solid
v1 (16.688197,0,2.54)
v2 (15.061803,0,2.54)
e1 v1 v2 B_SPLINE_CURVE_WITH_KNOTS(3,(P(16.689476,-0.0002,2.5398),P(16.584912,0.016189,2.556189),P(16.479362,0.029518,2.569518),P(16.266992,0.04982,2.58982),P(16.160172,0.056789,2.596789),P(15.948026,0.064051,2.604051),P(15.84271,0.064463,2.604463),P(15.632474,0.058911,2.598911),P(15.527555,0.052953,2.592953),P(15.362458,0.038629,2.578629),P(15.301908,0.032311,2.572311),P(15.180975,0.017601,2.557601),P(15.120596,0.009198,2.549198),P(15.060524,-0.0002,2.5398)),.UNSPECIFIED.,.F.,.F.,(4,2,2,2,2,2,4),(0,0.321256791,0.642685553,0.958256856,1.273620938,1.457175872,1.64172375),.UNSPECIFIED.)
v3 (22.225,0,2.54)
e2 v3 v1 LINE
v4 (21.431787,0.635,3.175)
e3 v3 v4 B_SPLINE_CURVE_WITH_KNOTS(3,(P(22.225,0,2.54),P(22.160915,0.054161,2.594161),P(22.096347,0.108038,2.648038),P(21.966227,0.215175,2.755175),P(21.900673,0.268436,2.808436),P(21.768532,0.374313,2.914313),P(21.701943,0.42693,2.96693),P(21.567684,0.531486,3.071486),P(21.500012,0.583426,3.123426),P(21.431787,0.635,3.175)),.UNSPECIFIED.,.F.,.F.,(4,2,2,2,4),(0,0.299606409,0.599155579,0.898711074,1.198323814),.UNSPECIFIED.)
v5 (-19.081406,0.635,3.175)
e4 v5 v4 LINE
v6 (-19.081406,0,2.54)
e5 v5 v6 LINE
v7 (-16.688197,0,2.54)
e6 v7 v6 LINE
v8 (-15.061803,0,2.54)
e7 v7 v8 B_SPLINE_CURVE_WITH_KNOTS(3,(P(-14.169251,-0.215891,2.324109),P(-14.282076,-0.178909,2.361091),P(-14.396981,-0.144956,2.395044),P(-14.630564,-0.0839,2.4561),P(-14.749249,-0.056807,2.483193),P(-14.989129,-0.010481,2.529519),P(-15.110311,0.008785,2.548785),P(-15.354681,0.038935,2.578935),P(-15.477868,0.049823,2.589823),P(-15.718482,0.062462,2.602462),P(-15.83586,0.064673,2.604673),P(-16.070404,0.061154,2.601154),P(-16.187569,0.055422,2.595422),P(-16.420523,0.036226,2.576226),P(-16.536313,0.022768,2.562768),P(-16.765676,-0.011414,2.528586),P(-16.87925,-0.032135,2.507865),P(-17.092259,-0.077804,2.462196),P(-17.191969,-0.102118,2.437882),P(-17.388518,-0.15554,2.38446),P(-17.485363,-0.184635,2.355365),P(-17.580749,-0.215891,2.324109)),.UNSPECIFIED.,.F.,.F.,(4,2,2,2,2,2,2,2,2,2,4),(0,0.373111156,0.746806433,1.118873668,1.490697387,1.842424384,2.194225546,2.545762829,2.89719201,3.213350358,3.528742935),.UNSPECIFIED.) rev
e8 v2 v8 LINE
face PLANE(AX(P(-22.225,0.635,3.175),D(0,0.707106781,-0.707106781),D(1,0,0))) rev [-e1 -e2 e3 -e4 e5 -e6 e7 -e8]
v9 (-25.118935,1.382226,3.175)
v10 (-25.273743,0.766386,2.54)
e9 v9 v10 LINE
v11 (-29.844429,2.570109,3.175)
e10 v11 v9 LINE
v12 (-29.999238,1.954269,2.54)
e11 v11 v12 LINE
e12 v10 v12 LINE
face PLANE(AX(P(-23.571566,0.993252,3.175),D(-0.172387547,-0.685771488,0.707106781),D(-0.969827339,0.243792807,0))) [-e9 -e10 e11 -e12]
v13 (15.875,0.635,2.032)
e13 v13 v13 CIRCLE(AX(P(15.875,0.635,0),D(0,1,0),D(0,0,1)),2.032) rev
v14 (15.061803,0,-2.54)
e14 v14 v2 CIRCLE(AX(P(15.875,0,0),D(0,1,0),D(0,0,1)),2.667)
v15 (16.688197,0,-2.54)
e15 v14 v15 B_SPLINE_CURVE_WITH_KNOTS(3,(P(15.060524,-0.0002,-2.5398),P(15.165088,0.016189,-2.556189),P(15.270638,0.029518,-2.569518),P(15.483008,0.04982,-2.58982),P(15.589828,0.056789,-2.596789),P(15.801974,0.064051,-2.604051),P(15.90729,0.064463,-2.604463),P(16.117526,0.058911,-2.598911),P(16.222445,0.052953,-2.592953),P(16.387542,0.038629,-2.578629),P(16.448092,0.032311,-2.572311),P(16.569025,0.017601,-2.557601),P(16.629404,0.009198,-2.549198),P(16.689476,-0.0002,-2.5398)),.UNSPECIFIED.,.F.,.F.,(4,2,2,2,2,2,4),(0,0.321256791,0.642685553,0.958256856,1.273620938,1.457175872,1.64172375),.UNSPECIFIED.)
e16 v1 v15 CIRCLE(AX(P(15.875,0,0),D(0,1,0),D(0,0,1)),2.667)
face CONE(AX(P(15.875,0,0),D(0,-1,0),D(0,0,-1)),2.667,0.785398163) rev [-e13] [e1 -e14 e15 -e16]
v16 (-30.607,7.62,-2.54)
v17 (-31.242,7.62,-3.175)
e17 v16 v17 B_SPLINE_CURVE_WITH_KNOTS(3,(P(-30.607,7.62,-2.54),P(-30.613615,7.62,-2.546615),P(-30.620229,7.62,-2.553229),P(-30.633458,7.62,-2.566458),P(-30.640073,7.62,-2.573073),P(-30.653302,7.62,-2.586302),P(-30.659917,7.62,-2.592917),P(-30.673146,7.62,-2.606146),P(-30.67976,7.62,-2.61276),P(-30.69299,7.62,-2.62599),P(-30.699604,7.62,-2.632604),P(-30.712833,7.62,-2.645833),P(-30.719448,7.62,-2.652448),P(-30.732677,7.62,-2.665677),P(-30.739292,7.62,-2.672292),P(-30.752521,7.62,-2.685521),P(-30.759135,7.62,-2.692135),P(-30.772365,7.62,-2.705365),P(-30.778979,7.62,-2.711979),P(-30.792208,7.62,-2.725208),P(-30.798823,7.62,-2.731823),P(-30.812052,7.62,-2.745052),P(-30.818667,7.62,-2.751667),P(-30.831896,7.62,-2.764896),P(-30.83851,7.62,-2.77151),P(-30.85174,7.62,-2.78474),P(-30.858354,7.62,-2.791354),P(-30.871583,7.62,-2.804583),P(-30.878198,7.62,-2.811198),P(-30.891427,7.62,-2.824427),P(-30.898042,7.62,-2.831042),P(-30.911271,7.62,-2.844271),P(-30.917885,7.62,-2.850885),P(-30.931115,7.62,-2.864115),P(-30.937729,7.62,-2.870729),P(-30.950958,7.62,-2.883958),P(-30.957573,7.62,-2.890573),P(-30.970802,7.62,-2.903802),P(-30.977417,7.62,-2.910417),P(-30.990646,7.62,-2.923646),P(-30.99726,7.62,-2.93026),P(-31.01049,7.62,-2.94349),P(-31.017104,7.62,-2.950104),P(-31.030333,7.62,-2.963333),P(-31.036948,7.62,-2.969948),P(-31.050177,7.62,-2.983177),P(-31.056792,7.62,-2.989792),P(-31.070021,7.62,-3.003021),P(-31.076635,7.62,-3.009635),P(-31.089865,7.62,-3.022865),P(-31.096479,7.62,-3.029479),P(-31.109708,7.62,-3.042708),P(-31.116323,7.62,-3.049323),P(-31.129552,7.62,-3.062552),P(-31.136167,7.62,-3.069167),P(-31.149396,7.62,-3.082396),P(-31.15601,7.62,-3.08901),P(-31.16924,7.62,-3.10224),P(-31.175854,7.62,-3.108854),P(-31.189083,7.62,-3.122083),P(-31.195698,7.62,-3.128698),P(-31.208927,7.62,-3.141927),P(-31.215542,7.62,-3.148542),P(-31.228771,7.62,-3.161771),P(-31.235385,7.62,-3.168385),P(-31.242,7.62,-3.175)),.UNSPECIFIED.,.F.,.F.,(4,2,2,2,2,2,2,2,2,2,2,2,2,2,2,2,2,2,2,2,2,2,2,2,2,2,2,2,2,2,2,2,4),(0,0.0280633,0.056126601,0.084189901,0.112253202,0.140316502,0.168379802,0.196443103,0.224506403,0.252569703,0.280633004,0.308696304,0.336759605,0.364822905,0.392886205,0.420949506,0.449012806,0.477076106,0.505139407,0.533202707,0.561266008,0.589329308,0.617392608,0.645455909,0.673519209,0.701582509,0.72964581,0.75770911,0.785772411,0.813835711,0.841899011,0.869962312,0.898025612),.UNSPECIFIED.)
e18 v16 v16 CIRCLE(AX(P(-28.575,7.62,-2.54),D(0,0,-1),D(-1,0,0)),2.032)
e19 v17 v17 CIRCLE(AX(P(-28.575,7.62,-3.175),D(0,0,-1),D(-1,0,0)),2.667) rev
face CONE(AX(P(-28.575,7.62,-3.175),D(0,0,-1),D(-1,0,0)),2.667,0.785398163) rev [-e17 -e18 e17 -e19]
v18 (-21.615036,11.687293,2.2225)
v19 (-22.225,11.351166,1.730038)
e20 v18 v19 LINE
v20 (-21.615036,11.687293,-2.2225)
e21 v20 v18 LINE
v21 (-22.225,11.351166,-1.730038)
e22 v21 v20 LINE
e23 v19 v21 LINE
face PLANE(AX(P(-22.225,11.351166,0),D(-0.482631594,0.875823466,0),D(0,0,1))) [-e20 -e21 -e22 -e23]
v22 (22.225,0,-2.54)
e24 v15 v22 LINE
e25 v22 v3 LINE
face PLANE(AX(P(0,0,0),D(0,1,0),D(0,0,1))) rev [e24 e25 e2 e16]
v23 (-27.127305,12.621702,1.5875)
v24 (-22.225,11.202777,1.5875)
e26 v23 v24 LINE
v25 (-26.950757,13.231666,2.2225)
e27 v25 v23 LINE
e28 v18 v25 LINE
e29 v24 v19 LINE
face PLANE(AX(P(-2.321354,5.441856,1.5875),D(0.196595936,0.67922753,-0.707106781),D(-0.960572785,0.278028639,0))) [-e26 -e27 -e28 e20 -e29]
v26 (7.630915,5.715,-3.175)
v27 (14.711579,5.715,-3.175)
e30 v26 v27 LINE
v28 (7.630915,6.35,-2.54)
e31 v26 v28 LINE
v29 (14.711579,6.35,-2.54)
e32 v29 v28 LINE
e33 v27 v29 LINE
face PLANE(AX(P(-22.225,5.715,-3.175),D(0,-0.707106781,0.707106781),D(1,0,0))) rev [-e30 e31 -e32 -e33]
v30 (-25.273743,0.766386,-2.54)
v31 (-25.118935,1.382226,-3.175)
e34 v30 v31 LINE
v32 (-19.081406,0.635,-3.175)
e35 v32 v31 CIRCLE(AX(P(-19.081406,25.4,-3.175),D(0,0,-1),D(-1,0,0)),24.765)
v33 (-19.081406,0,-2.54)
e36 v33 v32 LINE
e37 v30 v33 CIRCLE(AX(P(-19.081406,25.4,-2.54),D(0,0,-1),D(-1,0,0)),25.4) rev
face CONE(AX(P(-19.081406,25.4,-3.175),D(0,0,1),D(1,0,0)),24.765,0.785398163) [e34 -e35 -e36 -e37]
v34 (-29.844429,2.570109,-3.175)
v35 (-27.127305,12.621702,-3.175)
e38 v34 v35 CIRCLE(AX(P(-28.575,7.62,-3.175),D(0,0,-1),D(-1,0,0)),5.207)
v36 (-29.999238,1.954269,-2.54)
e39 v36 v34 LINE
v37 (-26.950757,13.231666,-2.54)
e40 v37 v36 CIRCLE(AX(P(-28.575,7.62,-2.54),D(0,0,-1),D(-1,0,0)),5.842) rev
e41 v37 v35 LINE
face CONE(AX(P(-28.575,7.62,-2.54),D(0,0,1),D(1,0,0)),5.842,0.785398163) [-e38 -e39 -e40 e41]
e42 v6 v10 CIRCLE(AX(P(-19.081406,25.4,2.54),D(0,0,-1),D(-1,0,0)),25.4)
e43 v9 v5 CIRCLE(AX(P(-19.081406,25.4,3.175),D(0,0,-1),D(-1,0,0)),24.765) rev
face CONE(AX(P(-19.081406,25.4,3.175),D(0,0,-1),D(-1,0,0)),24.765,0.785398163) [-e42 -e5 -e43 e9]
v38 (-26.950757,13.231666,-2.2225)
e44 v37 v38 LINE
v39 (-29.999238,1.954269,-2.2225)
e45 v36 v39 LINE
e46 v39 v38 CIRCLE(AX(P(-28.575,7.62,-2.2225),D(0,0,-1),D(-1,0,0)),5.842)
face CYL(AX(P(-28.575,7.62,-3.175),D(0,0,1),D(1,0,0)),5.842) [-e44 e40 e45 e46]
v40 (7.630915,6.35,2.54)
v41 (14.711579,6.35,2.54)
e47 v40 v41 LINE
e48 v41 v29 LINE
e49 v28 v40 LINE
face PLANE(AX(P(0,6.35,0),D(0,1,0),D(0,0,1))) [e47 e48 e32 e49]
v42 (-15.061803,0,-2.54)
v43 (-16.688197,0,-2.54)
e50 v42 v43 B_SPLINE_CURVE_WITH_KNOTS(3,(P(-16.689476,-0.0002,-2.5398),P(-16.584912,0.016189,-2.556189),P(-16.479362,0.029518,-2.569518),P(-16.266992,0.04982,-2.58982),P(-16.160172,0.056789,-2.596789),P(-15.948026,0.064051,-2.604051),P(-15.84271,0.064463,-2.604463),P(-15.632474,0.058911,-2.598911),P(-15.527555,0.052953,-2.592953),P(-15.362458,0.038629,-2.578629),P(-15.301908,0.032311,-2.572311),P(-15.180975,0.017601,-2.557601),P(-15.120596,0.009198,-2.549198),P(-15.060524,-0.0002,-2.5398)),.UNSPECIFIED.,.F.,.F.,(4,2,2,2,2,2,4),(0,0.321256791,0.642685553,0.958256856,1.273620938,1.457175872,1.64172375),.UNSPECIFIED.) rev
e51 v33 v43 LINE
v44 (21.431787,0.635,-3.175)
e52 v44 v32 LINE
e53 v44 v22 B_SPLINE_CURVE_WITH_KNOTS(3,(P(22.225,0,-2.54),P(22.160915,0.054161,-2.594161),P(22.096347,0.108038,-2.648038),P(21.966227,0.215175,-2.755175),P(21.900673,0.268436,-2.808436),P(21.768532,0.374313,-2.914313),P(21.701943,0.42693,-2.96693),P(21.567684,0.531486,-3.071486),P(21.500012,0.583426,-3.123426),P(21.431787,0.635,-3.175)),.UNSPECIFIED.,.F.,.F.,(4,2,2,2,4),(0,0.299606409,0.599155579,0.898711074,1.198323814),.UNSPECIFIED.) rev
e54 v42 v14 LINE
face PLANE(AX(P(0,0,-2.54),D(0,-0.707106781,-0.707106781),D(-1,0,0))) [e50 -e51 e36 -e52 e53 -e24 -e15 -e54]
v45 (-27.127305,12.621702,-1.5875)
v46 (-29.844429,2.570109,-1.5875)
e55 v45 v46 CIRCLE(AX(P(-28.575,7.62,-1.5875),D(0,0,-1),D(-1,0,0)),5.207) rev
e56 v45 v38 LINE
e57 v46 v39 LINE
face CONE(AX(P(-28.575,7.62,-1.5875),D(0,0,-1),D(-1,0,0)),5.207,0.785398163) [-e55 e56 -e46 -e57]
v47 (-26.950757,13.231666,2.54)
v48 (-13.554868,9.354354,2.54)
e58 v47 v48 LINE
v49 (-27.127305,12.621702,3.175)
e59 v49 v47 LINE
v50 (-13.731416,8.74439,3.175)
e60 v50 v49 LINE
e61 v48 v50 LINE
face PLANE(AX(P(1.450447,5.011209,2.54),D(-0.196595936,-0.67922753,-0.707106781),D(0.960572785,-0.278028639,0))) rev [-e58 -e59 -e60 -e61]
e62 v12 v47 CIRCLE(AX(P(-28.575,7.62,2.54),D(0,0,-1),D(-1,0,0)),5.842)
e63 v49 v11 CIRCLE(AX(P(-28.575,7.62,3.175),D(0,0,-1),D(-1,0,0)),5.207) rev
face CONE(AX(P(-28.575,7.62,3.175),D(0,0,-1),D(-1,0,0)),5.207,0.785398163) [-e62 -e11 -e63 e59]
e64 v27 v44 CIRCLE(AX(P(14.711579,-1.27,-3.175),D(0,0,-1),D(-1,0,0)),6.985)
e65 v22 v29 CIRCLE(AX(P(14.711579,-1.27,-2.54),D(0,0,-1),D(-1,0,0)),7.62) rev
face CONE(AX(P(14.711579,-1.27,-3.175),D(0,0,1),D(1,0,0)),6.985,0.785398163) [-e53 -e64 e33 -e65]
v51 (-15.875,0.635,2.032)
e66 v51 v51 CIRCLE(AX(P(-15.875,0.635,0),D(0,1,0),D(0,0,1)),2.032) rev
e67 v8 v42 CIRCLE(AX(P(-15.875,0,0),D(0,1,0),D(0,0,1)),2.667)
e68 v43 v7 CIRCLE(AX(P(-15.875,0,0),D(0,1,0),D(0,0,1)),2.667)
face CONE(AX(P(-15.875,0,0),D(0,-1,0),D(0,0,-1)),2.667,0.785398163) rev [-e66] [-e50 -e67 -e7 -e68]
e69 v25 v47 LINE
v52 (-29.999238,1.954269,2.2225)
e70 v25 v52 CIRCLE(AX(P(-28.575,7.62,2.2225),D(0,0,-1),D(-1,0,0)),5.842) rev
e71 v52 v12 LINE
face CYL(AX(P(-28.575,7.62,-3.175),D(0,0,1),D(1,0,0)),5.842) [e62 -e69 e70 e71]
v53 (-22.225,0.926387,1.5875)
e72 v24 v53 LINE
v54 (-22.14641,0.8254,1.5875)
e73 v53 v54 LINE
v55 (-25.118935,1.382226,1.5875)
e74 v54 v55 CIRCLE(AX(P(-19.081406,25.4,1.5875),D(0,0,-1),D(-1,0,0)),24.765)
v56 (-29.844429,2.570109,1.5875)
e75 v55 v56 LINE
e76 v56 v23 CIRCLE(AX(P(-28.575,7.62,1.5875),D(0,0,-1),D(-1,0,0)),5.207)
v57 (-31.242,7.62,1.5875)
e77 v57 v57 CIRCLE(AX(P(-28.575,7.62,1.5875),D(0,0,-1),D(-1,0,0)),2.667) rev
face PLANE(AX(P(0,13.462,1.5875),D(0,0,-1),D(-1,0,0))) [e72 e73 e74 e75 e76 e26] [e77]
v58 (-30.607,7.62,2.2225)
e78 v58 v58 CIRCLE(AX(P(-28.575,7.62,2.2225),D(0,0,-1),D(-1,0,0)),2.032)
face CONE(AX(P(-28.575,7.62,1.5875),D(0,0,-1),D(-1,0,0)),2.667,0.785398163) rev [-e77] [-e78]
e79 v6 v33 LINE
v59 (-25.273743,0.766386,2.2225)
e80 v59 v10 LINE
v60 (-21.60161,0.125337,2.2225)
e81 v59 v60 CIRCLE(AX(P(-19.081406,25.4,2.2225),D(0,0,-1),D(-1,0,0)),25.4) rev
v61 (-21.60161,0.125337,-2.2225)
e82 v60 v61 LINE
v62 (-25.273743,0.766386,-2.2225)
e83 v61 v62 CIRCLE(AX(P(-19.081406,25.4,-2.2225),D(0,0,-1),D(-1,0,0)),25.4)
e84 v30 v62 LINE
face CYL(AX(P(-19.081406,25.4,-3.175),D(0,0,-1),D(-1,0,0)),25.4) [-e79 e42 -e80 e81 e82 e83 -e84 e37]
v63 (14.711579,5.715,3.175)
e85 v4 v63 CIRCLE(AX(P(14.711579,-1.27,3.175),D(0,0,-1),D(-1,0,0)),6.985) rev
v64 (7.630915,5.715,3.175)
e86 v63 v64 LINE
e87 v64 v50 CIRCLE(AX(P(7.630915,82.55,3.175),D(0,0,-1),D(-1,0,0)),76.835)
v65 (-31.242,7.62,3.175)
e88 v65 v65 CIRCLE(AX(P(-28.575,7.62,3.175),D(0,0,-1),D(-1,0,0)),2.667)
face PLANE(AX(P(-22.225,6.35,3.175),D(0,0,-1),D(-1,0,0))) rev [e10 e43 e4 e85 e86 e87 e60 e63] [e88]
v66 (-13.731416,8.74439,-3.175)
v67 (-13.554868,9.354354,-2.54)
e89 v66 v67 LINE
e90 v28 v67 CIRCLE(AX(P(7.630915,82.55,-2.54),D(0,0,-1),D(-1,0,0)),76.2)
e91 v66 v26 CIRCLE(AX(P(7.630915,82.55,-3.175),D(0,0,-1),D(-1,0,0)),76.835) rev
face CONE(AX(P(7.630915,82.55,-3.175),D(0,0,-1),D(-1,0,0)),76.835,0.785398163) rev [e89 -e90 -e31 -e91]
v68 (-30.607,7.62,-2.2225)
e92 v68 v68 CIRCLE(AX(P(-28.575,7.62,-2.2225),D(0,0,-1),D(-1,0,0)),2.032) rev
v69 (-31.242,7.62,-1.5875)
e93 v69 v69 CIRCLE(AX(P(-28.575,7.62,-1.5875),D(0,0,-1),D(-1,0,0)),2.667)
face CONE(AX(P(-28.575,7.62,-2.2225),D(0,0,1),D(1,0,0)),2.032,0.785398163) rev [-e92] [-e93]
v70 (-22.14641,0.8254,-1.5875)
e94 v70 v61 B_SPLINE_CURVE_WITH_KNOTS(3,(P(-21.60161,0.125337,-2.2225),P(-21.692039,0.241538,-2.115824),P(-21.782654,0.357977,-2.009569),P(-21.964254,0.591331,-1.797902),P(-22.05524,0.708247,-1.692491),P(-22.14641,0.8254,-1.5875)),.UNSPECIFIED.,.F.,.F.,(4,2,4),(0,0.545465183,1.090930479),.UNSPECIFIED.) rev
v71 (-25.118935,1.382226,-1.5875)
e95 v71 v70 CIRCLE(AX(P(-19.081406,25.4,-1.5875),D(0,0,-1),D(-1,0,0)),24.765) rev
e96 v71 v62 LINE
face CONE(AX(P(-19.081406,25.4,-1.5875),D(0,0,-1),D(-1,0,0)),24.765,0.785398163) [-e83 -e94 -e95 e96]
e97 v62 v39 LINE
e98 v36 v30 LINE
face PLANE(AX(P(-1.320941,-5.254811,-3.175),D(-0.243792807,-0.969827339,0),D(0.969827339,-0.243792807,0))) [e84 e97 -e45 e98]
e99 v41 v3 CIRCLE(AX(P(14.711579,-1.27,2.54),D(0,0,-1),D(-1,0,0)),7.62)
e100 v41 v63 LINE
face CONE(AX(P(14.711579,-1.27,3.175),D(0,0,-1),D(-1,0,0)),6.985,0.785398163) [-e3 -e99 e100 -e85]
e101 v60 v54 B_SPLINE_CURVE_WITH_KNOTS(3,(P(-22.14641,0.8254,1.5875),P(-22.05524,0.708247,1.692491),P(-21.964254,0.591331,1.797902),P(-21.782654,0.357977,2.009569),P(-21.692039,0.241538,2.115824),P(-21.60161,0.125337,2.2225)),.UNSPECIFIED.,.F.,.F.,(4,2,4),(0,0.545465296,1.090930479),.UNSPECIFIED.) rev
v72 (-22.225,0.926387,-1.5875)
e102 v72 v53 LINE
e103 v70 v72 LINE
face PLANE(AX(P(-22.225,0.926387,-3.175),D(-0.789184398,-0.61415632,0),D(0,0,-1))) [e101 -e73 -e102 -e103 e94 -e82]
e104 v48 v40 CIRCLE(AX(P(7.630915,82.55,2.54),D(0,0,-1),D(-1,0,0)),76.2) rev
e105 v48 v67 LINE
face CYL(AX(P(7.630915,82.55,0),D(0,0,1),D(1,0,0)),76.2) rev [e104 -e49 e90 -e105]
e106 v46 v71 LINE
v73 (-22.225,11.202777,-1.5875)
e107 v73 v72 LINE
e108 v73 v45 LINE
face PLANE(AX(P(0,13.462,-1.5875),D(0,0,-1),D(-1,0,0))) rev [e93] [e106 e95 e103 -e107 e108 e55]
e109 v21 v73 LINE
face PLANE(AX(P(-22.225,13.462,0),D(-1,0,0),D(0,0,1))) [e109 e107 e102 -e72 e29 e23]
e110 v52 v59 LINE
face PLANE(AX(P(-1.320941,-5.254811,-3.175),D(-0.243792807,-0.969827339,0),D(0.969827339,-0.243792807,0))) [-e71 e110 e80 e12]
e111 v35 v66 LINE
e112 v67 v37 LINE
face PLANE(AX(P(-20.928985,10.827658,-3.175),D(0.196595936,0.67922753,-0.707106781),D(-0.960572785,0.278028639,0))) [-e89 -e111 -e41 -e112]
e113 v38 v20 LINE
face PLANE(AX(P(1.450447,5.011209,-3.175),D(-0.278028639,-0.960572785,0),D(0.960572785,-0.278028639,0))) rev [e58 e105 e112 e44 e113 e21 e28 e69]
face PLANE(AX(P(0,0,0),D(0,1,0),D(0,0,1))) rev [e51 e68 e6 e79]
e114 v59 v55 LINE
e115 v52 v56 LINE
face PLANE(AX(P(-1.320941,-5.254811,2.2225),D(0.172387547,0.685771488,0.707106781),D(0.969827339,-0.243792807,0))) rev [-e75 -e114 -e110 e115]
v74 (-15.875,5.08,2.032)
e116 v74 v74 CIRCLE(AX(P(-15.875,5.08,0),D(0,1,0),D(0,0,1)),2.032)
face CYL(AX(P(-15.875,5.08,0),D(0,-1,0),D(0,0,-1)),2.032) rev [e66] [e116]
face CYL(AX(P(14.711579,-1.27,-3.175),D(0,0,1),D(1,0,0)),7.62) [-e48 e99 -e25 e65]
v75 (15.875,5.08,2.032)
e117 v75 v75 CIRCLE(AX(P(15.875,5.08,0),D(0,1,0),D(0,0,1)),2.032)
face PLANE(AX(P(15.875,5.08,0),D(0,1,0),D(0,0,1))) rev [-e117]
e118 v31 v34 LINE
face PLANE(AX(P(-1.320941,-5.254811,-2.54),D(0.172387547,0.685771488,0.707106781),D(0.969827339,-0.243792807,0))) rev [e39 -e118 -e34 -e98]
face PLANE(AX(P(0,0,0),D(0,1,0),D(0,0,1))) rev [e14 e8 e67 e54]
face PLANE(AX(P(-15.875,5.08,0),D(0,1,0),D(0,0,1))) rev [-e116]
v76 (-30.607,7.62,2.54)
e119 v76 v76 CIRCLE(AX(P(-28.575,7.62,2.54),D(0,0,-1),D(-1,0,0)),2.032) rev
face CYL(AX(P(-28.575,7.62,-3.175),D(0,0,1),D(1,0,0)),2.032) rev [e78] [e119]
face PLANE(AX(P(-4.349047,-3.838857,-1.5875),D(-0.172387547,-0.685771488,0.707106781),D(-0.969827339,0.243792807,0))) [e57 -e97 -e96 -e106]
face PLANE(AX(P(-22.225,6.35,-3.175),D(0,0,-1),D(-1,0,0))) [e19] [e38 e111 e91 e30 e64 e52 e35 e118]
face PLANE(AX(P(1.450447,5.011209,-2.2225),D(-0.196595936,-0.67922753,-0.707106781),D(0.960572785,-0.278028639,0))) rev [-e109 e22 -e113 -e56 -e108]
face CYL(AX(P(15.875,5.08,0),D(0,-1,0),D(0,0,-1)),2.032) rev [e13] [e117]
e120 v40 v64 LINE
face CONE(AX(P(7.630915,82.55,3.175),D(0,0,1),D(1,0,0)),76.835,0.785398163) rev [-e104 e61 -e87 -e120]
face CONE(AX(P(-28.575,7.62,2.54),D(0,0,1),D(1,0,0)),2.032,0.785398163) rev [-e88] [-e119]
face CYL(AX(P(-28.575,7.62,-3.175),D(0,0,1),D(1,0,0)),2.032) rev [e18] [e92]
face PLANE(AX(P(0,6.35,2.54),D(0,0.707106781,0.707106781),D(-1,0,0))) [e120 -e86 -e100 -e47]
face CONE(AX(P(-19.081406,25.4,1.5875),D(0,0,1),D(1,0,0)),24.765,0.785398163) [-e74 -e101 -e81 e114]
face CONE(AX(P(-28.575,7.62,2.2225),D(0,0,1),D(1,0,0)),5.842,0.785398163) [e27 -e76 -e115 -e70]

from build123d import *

# Parameters (mm, degrees)
SKETCH1_W           = 44.45
SKETCH1_H           = 6.35
BOSS_EXTRUDE1_DEPTH = 6.35
SKETCH2_R           = 5.842
SKETCH2_R_2         = 2.032
BOSS_EXTRUDE2_DEPTH = 6.35
SKETCH4_W           = 12.192
SKETCH4_H           = 3.175
CUT_EXTRUDE2_DEPTH  = 38.092262778
FILLET1_R           = 76.2
FILLET2_R           = 25.4
FILLET3_R           = 7.62
SKETCH1_3_R         = 2.032
CUT_EXTRUDE1_DEPTH  = 5.08
CHAMFER2_SIZE       = 0.635
CHAMFER2_SIZE_2     = 0.512675012
CHAMFER2_SIZE_3     = 0.731105081


with BuildPart() as part:
    # Sketch1 → Boss-Extrude1 (new body)
    with BuildSketch(Plane(origin=(0, 0, 0), x_dir=(1, 0, 0), z_dir=(0, 1, 0))):
        Rectangle(SKETCH1_W, SKETCH1_H)
    extrude(amount=BOSS_EXTRUDE1_DEPTH)

    # Sketch2 → Boss-Extrude2 (add, through all)
    # profile 1 of 2: a face of its own
    with BuildSketch(Plane.XY.offset(3.175)):
        with BuildLine():
            Line((-3.175, 6.35), (-26.950756689, 13.231666211))
            ThreePointArc((-26.950756689, 13.231666211), (-23.905000352, 11.12999534), (-22.733, 7.62))
            ThreePointArc((-22.733, 7.62), (-24.982746663, 3.012974934), (-29.999237577, 1.954268686))
            Line((-29.999237577, 1.954268686), (-22.225, 0))
            Line((-22.225, 0), (-22.225, 6.35))
            Line((-22.225, 6.35), (-3.175, 6.35))
        make_face()
    # profile 2 of 2: a face of its own
    with BuildSketch(Plane.XY.offset(3.175)):
        with Locations((-28.575, 7.62)):
            Circle(SKETCH2_R)
        with Locations((-28.575, 7.62)):
            Circle(SKETCH2_R_2, mode=Mode.SUBTRACT)
    extrude(amount=-BOSS_EXTRUDE2_DEPTH)

    # Sketch4 → Cut-Extrude2 (cut, through all)
    with BuildSketch(Plane.XZ):
        with Locations((-28.321, 0)):
            Rectangle(SKETCH4_W, SKETCH4_H)
    extrude(amount=-CUT_EXTRUDE2_DEPTH, mode=Mode.SUBTRACT)

    # Fillet1
    fillet1_edges = [part.edges().sort_by_distance(p)[0] for p in [
        (-3.175, 6.35, 0),
    ]]
    fillet(fillet1_edges, radius=FILLET1_R)

    # Fillet2
    # the kernel refuses this fillet: 25.4 mm, written as the material it takes off along each edge
    with BuildSketch(Plane(origin=(-22.225, 0, 6.271484857), x_dir=(-0.9698273389527705, 0.2437928067433249, 0), z_dir=(0, 0, -1))) as fillet2_piece_1:
        with BuildLine():
            CenterArc((FILLET2_R * 0.123763541059, FILLET2_R), FILLET2_R, 255.889496413, 14.110503587)
            Line((-FILLET2_R * 0.120029265684, FILLET2_R * 0.0301726610472), (0, 0))
            Line((0, 0), (FILLET2_R * 0.123763541059, 0))
        make_face()
    extrude(amount=17.305469714, mode=Mode.SUBTRACT)
    with BuildSketch(Plane(origin=(-22.225, 0, 11.033984857), x_dir=(1, 0, 0), z_dir=(0, 0, -1))) as fillet2_piece_2:
        with BuildLine():
            CenterArc((FILLET2_R * 0.123763541059, -FILLET2_R), FILLET2_R, 90, 14.110503587)
            Line((-FILLET2_R * 0.120029265684, -FILLET2_R * 0.0301726610472), (0, 0))
            Line((0, 0), (FILLET2_R * 0.123763541059, 0))
        make_face()
    extrude(amount=17.305469714, mode=Mode.SUBTRACT)

    # Fillet3
    # the kernel refuses this fillet: 7.62 mm, written as the material it takes off along each edge
    with BuildSketch(Plane(origin=(22.225, 6.35, -21.958553311), x_dir=(0, -1, 0), z_dir=(0, 0, 1))) as fillet3_piece_1:
        with BuildLine():
            CenterArc((7.62, -7.513421325), FILLET3_R, 99.594068227, 80.405931773)
            Line((0, -7.513421325), (-0.1524, -7.513421325))
            Line((-0.1524, -7.513421325), (-0.1524, 0))
            Line((-0.1524, 0), (0, 0.1524))
            ThreePointArc((0, 0.1524), (3.175, 0.1524), (6.3246, 0.150268426))
            Line((6.3246, 0.150268426), (6.35, 0))
        make_face()
    extrude(amount=43.917106623, mode=Mode.SUBTRACT)

    # Sketch1<3> → Cut-Extrude1 (cut)
    with BuildSketch(Plane(origin=(0, 0, 0), x_dir=(1, 0, 0), z_dir=(0, 1, 0))):
        with Locations(Location((-15.875, 0, 0), (0, 0, 270))):
            Circle(SKETCH1_3_R)
        with Locations(Location((15.875, 0, 0), (0, 0, 270))):
            Circle(SKETCH1_3_R)
    extrude(amount=CUT_EXTRUDE1_DEPTH, mode=Mode.SUBTRACT)

    # Chamfer2
    # the kernel refuses this chamfer: 0.731105081, 0.635, 0.512675012 mm, written as the material it takes off along each edge
    with BuildSketch(Plane(origin=(-13.554867596, 9.354353764, 3.175), x_dir=(0, 0, -1), z_dir=(-0.9605727852432785, 0.27802863926216387, 0)), Plane(origin=(-13.554867596, 9.354353764, -3.175), x_dir=(-0.27802863926216387, -0.9605727852432785, 0), z_dir=(-0.9605727852432785, 0.27802863926216387, 0))) as chamfer2_piece_1:
        Polygon((CHAMFER2_SIZE, 0), (0, CHAMFER2_SIZE), (0, 0), align=None)
    extrude(amount=13.945730401, mode=Mode.SUBTRACT)
    with BuildSketch(Plane(origin=(-29.999237577, 1.954268686, -3.175), x_dir=(0.2437928067433245, 0.9698273389527705, 0), z_dir=(0.9698273389527705, -0.24379280674332449, 0))) as chamfer2_piece_2:
        Polygon((CHAMFER2_SIZE, 0), (0, CHAMFER2_SIZE), (0, 0), align=None)
    extrude(amount=4.872510847, mode=Mode.SUBTRACT)
    with BuildSketch(Plane(origin=(-28.575, 7.62, -3.175), x_dir=(0.2780286392621638, 0.9605727852432784, 0), z_dir=(0.9605727852432784, -0.2780286392621638, 0))) as chamfer2_piece_3:
        Polygon((5.842 - CHAMFER2_SIZE, 0), (5.842, CHAMFER2_SIZE), (5.842, 0), align=None)
    revolve(axis=Axis((-28.575, 7.62, -3.175), (0, 0, 1)), revolution_arc=182.032079325, mode=Mode.SUBTRACT)
    with BuildSketch(Plane(origin=(-28.575, 7.62, 3.175), x_dir=(1, 0, 0), z_dir=(0, -1, 0))) as chamfer2_piece_4:
        Polygon((2.032 + CHAMFER2_SIZE, 0), (2.032, -CHAMFER2_SIZE), (2.032, 0), align=None)
    revolve(axis=Axis((-28.575, 7.62, 3.175), (0, 0, 1)), mode=Mode.SUBTRACT)
    with BuildSketch(Plane(origin=(-28.575, 7.62, -3.175), x_dir=(1, 0, 0), z_dir=(0, -1, 0))) as chamfer2_piece_5:
        Polygon((2.032 + CHAMFER2_SIZE, 0), (2.032, CHAMFER2_SIZE), (2.032, 0), align=None)
    revolve(axis=Axis((-28.575, 7.62, -3.175), (0, 0, 1)), mode=Mode.SUBTRACT)
    with BuildSketch(Plane(origin=(-28.575, 7.62, 3.175), x_dir=(0.2780286392621638, 0.9605727852432784, 0), z_dir=(0.9605727852432784, -0.2780286392621638, 0))) as chamfer2_piece_6:
        Polygon((5.842 - CHAMFER2_SIZE, 0), (5.842, -CHAMFER2_SIZE), (5.842, 0), align=None)
    revolve(axis=Axis((-28.575, 7.62, 3.175), (0, 0, 1)), revolution_arc=182.032079325, mode=Mode.SUBTRACT)
    with BuildSketch(Plane(origin=(-29.999237577, 1.954268686, 3.175), x_dir=(0.24379280674332446, 0.9698273389527705, 0), z_dir=(0.9698273389527705, -0.24379280674332449, 0))) as chamfer2_piece_7:
        Polygon((CHAMFER2_SIZE, 0), (0, -CHAMFER2_SIZE), (0, 0), align=None)
    extrude(amount=4.872510847, mode=Mode.SUBTRACT)
    with BuildSketch(Plane(origin=(-28.575, 7.62, -1.5875), x_dir=(1, 0, 0), z_dir=(0, -1, 0))) as chamfer2_piece_8:
        Polygon((2.032, -CHAMFER2_SIZE), (2.032 + CHAMFER2_SIZE, 0), (2.032, 0), align=None)
    revolve(axis=Axis((-28.575, 7.62, -1.5875), (0, 0, 1)), mode=Mode.SUBTRACT)
    with BuildSketch(Plane(origin=(-28.575, 7.62, 1.5875), x_dir=(1, 0, 0), z_dir=(0, -1, 0))) as chamfer2_piece_9:
        Polygon((2.032 + CHAMFER2_SIZE, 0), (2.032, CHAMFER2_SIZE), (2.032, 0), align=None)
    revolve(axis=Axis((-28.575, 7.62, 1.5875), (0, 0, 1)), mode=Mode.SUBTRACT)
    with BuildSketch(Plane(origin=(7.630914716, 6.35, -3.175), x_dir=(0, -1, 0), z_dir=(1, 0, 0))) as chamfer2_piece_10:
        Polygon((CHAMFER2_SIZE, 0), (0, -CHAMFER2_SIZE), (0, 0), align=None)
    extrude(amount=7.08066396, mode=Mode.SUBTRACT)
    with BuildSketch(Plane(origin=(14.711578675, 6.35, 3.175), x_dir=(0, 0, -1), z_dir=(-1, 0, 0))) as chamfer2_piece_11:
        Polygon((CHAMFER2_SIZE, 0), (0, CHAMFER2_SIZE), (0, 0), align=None)
    extrude(amount=7.08066396, mode=Mode.SUBTRACT)
    with BuildSketch(Plane(origin=(7.630914716, 82.55, 3.175), x_dir=(0, -1, 0), z_dir=(1, 0, 0))) as chamfer2_piece_12:
        Polygon((76.2, CHAMFER2_SIZE), (76.2 + CHAMFER2_SIZE, 0), (76.2, 0), align=None)
    revolve(axis=Axis((7.630914716, 82.55, 3.175), (0, 0, -1)), revolution_arc=16.142582912, mode=Mode.SUBTRACT)
    with BuildSketch(Plane(origin=(7.630914716, 82.55, -3.175), x_dir=(0, -1, 0), z_dir=(1, 0, 0))) as chamfer2_piece_13:
        Polygon((76.2 + CHAMFER2_SIZE, 0), (76.2, -CHAMFER2_SIZE), (76.2, 0), align=None)
    revolve(axis=Axis((7.630914716, 82.55, -3.175), (0, 0, -1)), revolution_arc=16.142582912, mode=Mode.SUBTRACT)
    with BuildSketch(Plane(origin=(23.858018697, 0, 3.175), x_dir=(0, 0, -1), z_dir=(-1, 0, 0))) as chamfer2_piece_14:
        Polygon((CHAMFER2_SIZE, 0), (0, -CHAMFER2_SIZE), (0, 0), align=None)
    extrude(amount=42.939424754, mode=Mode.SUBTRACT)
    with BuildSketch(Plane(origin=(-19.081406057, 25.4, 3.175), x_dir=(-0.24379280674296488, -0.9698273389528609, 0), z_dir=(-0.9698273389528609, 0.24379280674296488, 0))) as chamfer2_piece_15:
        Polygon((25.4, -CHAMFER2_SIZE), (25.4 - CHAMFER2_SIZE, 0), (25.4, 0), align=None)
    revolve(axis=Axis((-19.081406057, 25.4, 3.175), (0, 0, 1)), revolution_arc=14.110503587, mode=Mode.SUBTRACT)
    with BuildSketch(Plane(origin=(-19.081406057, 0, -3.175), x_dir=(0, 1, 0), z_dir=(1, 0, 0))) as chamfer2_piece_16:
        Polygon((CHAMFER2_SIZE, 0), (0, CHAMFER2_SIZE), (0, 0), align=None)
    extrude(amount=42.939424754, mode=Mode.SUBTRACT)
    with BuildSketch(Plane(origin=(-19.081406057, 25.4, -3.175), x_dir=(-0.24379280674296488, -0.9698273389528609, 0), z_dir=(-0.9698273389528609, 0.24379280674296488, 0))) as chamfer2_piece_17:
        Polygon((25.4 - CHAMFER2_SIZE, 0), (25.4, CHAMFER2_SIZE), (25.4, 0), align=None)
    revolve(axis=Axis((-19.081406057, 25.4, -3.175), (0, 0, 1)), revolution_arc=14.110503587, mode=Mode.SUBTRACT)
    with BuildSketch(Plane(origin=(14.711578675, -1.27, 3.175), x_dir=(0, 1, 0), z_dir=(-1, 0, 0))) as chamfer2_piece_18:
        Polygon((7.62, CHAMFER2_SIZE), (7.62 - CHAMFER2_SIZE, 0), (7.62, 0), align=None)
    revolve(axis=Axis((14.711578675, -1.27, 3.175), (0, 0, -1)), revolution_arc=92.688750294, mode=Mode.SUBTRACT)
    with BuildSketch(Plane(origin=(14.711578675, -1.27, -3.175), x_dir=(0, 1, 0), z_dir=(-1, 0, 0))) as chamfer2_piece_19:
        Polygon((7.62 - CHAMFER2_SIZE, 0), (7.62, -CHAMFER2_SIZE), (7.62, 0), align=None)
    revolve(axis=Axis((14.711578675, -1.27, -3.175), (0, 0, -1)), revolution_arc=92.688750294, mode=Mode.SUBTRACT)
    with BuildSketch(Plane(origin=(-15.875, 0, 0), x_dir=(0, 0, 1), z_dir=(-1, 0, 0))) as chamfer2_piece_20:
        Polygon((2.032 + CHAMFER2_SIZE, 0), (2.032, CHAMFER2_SIZE), (2.032, 0), align=None)
    revolve(axis=Axis((-15.875, 0, 0), (0, 1, 0)), mode=Mode.SUBTRACT)
    with BuildSketch(Plane(origin=(15.875, 0, 0), x_dir=(0, 0, 1), z_dir=(-1, 0, 0))) as chamfer2_piece_21:
        Polygon((2.032 + CHAMFER2_SIZE, 0), (2.032, CHAMFER2_SIZE), (2.032, 0), align=None)
    revolve(axis=Axis((15.875, 0, 0), (0, 1, 0)), mode=Mode.SUBTRACT)
    with BuildSketch(Plane(origin=(-22.225, 11.86384097, 1.5875), x_dir=(0.9605727852432789, -0.278028639262162, 0), z_dir=(0, 0, -1))) as chamfer2_piece_22:
        Polygon((CHAMFER2_SIZE, 0), (CHAMFER2_SIZE_2 * 0.278028639187, CHAMFER2_SIZE_2 * 0.960572784984), (0, 0), align=None)
    extrude(amount=3.175, mode=Mode.SUBTRACT)
    with BuildSketch(Plane(origin=(-22.225, 0.195281848, -1.5875), x_dir=(0.9937643681365105, -0.11150058574842527, 0), z_dir=(0, 0, 1))) as chamfer2_piece_23:
        with BuildLine():
            Line((0.627301622, 0), (-CHAMFER2_SIZE_3 * 0.111500585736, CHAMFER2_SIZE_3 * 0.993764368022))
            Line((-CHAMFER2_SIZE_3 * 0.111500585736, CHAMFER2_SIZE_3 * 0.993764368022), (0, 0))
            ThreePointArc((0, 0), (0.323858306, -0.001934575), (0.627301622, 0))
        make_face()
    extrude(amount=3.175, mode=Mode.SUBTRACT)
    # the kernel refuses this chamfer: 0.731105081, 0.635, 0.512675012 mm, written as the material it takes off along each edge
    with BuildSketch(Plane(origin=(-28.575, 7.62, 1.5875), x_dir=(0.2780286392621638, 0.9605727852432784, 0), z_dir=(0.9605727852432784, -0.2780286392621638, 0))) as chamfer2_2_piece_1:
        Polygon((5.842, CHAMFER2_SIZE), (5.842 - CHAMFER2_SIZE, 0), (5.842, 0), align=None)
    revolve(axis=Axis((-28.575, 7.62, 1.5875), (0, 0, 1)), revolution_arc=182.032079325, mode=Mode.SUBTRACT)
    with BuildSketch(Plane(origin=(-25.273743348, 0.766385591, 1.5875), x_dir=(0, 0, 1), z_dir=(-0.9698273389527705, 0.24379280674332449, 0))) as chamfer2_2_piece_2:
        Polygon((CHAMFER2_SIZE, 0), (0, CHAMFER2_SIZE), (0, 0), align=None)
    extrude(amount=4.872510847, mode=Mode.SUBTRACT)
    with BuildSketch(Plane(origin=(-20.046402963, 11.233266818, 1.5875), x_dir=(0, 0, 1), z_dir=(-0.9605727852432785, 0.2780286392621639, 0))) as chamfer2_2_piece_3_section:
        Polygon((CHAMFER2_SIZE, 0), (0, -CHAMFER2_SIZE), (0, 0), align=None)
    chamfer2_2_piece_3 = extrude(amount=7.187746554, mode=Mode.PRIVATE)
    chamfer2_2_piece_3 = split(chamfer2_2_piece_3, bisect_by=Plane(origin=(-22.225, 11.233266818, 1.5875), z_dir=(-1, 0, 0)), keep=Keep.TOP, mode=Mode.PRIVATE)
    add(chamfer2_2_piece_3, mode=Mode.SUBTRACT)
    with BuildSketch(Plane(origin=(-20.046402963, 11.233266818, 1.5875), x_dir=(0, 0, 1), z_dir=(-0.9605727852432785, 0.2780286392621639, 0))) as chamfer2_2_piece_4_section:
        Polygon((CHAMFER2_SIZE, 0), (0, -CHAMFER2_SIZE), (0, 0), align=None)
    chamfer2_2_piece_4 = extrude(amount=7.187746554, mode=Mode.PRIVATE)
    chamfer2_2_piece_4 = split(chamfer2_2_piece_4, bisect_by=Plane(origin=(-20.603706639, 12.24459646, 1.5875), z_dir=(-0.48263159408242934, 0.8758234664551146, 0)), keep=Keep.TOP, mode=Mode.PRIVATE)
    add(chamfer2_2_piece_4, mode=Mode.SUBTRACT)
    with BuildSketch(Plane(origin=(-26.950756689, 13.231666211, -1.5875), x_dir=(-0.27802863926216387, -0.9605727852432785, 0), z_dir=(0.9605727852432785, -0.2780286392621639, 0))) as chamfer2_2_piece_5_section:
        Polygon((CHAMFER2_SIZE, 0), (0, CHAMFER2_SIZE), (0, 0), align=None)
    chamfer2_2_piece_5 = extrude(amount=7.187746554, mode=Mode.PRIVATE)
    chamfer2_2_piece_5 = split(chamfer2_2_piece_5, bisect_by=Plane(origin=(-25.055083199, 9.791619294, -1.5875), z_dir=(-0.48263159408242934, 0.8758234664551146, 0)), keep=Keep.TOP, mode=Mode.PRIVATE)
    add(chamfer2_2_piece_5, mode=Mode.SUBTRACT)
    with BuildSketch(Plane(origin=(-26.950756689, 13.231666211, -1.5875), x_dir=(-0.27802863926216387, -0.9605727852432785, 0), z_dir=(0.9605727852432785, -0.2780286392621639, 0))) as chamfer2_2_piece_6_section:
        Polygon((CHAMFER2_SIZE, 0), (0, CHAMFER2_SIZE), (0, 0), align=None)
    chamfer2_2_piece_6 = extrude(amount=7.187746554, mode=Mode.PRIVATE)
    chamfer2_2_piece_6 = split(chamfer2_2_piece_6, bisect_by=Plane(origin=(-22.225, 13.231666211, -1.5875), z_dir=(-1, 0, 0)), keep=Keep.TOP, mode=Mode.PRIVATE)
    add(chamfer2_2_piece_6, mode=Mode.SUBTRACT)
    with BuildSketch(Plane(origin=(-28.575, 7.62, -1.5875), x_dir=(-0.24379280674332418, -0.9698273389527706, 0), z_dir=(0.9698273389527706, -0.24379280674332418, 0))) as chamfer2_2_piece_7:
        Polygon((5.842 - CHAMFER2_SIZE, 0), (5.842, CHAMFER2_SIZE), (5.842, 0), align=None)
    revolve(axis=Axis((-28.575, 7.62, -1.5875), (0, 0, -1)), revolution_arc=182.032079325, mode=Mode.SUBTRACT)
    with BuildSketch(Plane(origin=(-29.999237577, 1.954268686, -1.5875), x_dir=(0.24379280674332454, 0.9698273389527706, 1.0490296295670768e-15), z_dir=(0.9698273389527705, -0.24379280674332449, 0))) as chamfer2_2_piece_8:
        Polygon((CHAMFER2_SIZE, 0), (0, -CHAMFER2_SIZE), (0, 0), align=None)
    extrude(amount=4.872510847, mode=Mode.SUBTRACT)
    with BuildSketch(Plane(origin=(-19.081406057, 25.4, 1.5875), x_dir=(-0.24379280674296486, -0.9698273389528609, 0), z_dir=(-0.9698273389528609, 0.24379280674296486, 0))) as chamfer2_2_piece_9_section:
        Polygon((25.4 - CHAMFER2_SIZE, 0), (25.4, CHAMFER2_SIZE), (25.4, 0), align=None)
    chamfer2_2_piece_9 = revolve(axis=Axis((-19.081406057, 25.4, 1.5875), (0, 0, 1)), revolution_arc=12.099888527, mode=Mode.PRIVATE)
    chamfer2_2_piece_9 = split(chamfer2_2_piece_9, bisect_by=Plane(origin=(-32.901208203, 14.645201948, 1.5875), z_dir=(-0.7891843983264014, -0.6141563200343995, 0)), keep=Keep.TOP, mode=Mode.PRIVATE)
    add(chamfer2_2_piece_9, mode=Mode.SUBTRACT)
    with BuildSketch(Plane(origin=(-19.081406057, 25.4, -1.5875), x_dir=(-0.03508465098697838, -0.9993843441164775, 0), z_dir=(0.9993843441164775, -0.03508465098697838, 0))) as chamfer2_2_piece_10_section:
        Polygon((25.4 - CHAMFER2_SIZE, 0), (25.4, CHAMFER2_SIZE), (25.4, 0), align=None)
    chamfer2_2_piece_10 = revolve(axis=Axis((-19.081406057, 25.4, -1.5875), (0, 0, -1)), revolution_arc=12.099888527, mode=Mode.PRIVATE)
    chamfer2_2_piece_10 = split(chamfer2_2_piece_10, bisect_by=Plane(origin=(-32.901208203, 14.645201948, -1.5875), z_dir=(-0.7891843983264014, -0.6141563200343995, 0)), keep=Keep.TOP, mode=Mode.PRIVATE)
    add(chamfer2_2_piece_10, mode=Mode.SUBTRACT)


solid = part.part
